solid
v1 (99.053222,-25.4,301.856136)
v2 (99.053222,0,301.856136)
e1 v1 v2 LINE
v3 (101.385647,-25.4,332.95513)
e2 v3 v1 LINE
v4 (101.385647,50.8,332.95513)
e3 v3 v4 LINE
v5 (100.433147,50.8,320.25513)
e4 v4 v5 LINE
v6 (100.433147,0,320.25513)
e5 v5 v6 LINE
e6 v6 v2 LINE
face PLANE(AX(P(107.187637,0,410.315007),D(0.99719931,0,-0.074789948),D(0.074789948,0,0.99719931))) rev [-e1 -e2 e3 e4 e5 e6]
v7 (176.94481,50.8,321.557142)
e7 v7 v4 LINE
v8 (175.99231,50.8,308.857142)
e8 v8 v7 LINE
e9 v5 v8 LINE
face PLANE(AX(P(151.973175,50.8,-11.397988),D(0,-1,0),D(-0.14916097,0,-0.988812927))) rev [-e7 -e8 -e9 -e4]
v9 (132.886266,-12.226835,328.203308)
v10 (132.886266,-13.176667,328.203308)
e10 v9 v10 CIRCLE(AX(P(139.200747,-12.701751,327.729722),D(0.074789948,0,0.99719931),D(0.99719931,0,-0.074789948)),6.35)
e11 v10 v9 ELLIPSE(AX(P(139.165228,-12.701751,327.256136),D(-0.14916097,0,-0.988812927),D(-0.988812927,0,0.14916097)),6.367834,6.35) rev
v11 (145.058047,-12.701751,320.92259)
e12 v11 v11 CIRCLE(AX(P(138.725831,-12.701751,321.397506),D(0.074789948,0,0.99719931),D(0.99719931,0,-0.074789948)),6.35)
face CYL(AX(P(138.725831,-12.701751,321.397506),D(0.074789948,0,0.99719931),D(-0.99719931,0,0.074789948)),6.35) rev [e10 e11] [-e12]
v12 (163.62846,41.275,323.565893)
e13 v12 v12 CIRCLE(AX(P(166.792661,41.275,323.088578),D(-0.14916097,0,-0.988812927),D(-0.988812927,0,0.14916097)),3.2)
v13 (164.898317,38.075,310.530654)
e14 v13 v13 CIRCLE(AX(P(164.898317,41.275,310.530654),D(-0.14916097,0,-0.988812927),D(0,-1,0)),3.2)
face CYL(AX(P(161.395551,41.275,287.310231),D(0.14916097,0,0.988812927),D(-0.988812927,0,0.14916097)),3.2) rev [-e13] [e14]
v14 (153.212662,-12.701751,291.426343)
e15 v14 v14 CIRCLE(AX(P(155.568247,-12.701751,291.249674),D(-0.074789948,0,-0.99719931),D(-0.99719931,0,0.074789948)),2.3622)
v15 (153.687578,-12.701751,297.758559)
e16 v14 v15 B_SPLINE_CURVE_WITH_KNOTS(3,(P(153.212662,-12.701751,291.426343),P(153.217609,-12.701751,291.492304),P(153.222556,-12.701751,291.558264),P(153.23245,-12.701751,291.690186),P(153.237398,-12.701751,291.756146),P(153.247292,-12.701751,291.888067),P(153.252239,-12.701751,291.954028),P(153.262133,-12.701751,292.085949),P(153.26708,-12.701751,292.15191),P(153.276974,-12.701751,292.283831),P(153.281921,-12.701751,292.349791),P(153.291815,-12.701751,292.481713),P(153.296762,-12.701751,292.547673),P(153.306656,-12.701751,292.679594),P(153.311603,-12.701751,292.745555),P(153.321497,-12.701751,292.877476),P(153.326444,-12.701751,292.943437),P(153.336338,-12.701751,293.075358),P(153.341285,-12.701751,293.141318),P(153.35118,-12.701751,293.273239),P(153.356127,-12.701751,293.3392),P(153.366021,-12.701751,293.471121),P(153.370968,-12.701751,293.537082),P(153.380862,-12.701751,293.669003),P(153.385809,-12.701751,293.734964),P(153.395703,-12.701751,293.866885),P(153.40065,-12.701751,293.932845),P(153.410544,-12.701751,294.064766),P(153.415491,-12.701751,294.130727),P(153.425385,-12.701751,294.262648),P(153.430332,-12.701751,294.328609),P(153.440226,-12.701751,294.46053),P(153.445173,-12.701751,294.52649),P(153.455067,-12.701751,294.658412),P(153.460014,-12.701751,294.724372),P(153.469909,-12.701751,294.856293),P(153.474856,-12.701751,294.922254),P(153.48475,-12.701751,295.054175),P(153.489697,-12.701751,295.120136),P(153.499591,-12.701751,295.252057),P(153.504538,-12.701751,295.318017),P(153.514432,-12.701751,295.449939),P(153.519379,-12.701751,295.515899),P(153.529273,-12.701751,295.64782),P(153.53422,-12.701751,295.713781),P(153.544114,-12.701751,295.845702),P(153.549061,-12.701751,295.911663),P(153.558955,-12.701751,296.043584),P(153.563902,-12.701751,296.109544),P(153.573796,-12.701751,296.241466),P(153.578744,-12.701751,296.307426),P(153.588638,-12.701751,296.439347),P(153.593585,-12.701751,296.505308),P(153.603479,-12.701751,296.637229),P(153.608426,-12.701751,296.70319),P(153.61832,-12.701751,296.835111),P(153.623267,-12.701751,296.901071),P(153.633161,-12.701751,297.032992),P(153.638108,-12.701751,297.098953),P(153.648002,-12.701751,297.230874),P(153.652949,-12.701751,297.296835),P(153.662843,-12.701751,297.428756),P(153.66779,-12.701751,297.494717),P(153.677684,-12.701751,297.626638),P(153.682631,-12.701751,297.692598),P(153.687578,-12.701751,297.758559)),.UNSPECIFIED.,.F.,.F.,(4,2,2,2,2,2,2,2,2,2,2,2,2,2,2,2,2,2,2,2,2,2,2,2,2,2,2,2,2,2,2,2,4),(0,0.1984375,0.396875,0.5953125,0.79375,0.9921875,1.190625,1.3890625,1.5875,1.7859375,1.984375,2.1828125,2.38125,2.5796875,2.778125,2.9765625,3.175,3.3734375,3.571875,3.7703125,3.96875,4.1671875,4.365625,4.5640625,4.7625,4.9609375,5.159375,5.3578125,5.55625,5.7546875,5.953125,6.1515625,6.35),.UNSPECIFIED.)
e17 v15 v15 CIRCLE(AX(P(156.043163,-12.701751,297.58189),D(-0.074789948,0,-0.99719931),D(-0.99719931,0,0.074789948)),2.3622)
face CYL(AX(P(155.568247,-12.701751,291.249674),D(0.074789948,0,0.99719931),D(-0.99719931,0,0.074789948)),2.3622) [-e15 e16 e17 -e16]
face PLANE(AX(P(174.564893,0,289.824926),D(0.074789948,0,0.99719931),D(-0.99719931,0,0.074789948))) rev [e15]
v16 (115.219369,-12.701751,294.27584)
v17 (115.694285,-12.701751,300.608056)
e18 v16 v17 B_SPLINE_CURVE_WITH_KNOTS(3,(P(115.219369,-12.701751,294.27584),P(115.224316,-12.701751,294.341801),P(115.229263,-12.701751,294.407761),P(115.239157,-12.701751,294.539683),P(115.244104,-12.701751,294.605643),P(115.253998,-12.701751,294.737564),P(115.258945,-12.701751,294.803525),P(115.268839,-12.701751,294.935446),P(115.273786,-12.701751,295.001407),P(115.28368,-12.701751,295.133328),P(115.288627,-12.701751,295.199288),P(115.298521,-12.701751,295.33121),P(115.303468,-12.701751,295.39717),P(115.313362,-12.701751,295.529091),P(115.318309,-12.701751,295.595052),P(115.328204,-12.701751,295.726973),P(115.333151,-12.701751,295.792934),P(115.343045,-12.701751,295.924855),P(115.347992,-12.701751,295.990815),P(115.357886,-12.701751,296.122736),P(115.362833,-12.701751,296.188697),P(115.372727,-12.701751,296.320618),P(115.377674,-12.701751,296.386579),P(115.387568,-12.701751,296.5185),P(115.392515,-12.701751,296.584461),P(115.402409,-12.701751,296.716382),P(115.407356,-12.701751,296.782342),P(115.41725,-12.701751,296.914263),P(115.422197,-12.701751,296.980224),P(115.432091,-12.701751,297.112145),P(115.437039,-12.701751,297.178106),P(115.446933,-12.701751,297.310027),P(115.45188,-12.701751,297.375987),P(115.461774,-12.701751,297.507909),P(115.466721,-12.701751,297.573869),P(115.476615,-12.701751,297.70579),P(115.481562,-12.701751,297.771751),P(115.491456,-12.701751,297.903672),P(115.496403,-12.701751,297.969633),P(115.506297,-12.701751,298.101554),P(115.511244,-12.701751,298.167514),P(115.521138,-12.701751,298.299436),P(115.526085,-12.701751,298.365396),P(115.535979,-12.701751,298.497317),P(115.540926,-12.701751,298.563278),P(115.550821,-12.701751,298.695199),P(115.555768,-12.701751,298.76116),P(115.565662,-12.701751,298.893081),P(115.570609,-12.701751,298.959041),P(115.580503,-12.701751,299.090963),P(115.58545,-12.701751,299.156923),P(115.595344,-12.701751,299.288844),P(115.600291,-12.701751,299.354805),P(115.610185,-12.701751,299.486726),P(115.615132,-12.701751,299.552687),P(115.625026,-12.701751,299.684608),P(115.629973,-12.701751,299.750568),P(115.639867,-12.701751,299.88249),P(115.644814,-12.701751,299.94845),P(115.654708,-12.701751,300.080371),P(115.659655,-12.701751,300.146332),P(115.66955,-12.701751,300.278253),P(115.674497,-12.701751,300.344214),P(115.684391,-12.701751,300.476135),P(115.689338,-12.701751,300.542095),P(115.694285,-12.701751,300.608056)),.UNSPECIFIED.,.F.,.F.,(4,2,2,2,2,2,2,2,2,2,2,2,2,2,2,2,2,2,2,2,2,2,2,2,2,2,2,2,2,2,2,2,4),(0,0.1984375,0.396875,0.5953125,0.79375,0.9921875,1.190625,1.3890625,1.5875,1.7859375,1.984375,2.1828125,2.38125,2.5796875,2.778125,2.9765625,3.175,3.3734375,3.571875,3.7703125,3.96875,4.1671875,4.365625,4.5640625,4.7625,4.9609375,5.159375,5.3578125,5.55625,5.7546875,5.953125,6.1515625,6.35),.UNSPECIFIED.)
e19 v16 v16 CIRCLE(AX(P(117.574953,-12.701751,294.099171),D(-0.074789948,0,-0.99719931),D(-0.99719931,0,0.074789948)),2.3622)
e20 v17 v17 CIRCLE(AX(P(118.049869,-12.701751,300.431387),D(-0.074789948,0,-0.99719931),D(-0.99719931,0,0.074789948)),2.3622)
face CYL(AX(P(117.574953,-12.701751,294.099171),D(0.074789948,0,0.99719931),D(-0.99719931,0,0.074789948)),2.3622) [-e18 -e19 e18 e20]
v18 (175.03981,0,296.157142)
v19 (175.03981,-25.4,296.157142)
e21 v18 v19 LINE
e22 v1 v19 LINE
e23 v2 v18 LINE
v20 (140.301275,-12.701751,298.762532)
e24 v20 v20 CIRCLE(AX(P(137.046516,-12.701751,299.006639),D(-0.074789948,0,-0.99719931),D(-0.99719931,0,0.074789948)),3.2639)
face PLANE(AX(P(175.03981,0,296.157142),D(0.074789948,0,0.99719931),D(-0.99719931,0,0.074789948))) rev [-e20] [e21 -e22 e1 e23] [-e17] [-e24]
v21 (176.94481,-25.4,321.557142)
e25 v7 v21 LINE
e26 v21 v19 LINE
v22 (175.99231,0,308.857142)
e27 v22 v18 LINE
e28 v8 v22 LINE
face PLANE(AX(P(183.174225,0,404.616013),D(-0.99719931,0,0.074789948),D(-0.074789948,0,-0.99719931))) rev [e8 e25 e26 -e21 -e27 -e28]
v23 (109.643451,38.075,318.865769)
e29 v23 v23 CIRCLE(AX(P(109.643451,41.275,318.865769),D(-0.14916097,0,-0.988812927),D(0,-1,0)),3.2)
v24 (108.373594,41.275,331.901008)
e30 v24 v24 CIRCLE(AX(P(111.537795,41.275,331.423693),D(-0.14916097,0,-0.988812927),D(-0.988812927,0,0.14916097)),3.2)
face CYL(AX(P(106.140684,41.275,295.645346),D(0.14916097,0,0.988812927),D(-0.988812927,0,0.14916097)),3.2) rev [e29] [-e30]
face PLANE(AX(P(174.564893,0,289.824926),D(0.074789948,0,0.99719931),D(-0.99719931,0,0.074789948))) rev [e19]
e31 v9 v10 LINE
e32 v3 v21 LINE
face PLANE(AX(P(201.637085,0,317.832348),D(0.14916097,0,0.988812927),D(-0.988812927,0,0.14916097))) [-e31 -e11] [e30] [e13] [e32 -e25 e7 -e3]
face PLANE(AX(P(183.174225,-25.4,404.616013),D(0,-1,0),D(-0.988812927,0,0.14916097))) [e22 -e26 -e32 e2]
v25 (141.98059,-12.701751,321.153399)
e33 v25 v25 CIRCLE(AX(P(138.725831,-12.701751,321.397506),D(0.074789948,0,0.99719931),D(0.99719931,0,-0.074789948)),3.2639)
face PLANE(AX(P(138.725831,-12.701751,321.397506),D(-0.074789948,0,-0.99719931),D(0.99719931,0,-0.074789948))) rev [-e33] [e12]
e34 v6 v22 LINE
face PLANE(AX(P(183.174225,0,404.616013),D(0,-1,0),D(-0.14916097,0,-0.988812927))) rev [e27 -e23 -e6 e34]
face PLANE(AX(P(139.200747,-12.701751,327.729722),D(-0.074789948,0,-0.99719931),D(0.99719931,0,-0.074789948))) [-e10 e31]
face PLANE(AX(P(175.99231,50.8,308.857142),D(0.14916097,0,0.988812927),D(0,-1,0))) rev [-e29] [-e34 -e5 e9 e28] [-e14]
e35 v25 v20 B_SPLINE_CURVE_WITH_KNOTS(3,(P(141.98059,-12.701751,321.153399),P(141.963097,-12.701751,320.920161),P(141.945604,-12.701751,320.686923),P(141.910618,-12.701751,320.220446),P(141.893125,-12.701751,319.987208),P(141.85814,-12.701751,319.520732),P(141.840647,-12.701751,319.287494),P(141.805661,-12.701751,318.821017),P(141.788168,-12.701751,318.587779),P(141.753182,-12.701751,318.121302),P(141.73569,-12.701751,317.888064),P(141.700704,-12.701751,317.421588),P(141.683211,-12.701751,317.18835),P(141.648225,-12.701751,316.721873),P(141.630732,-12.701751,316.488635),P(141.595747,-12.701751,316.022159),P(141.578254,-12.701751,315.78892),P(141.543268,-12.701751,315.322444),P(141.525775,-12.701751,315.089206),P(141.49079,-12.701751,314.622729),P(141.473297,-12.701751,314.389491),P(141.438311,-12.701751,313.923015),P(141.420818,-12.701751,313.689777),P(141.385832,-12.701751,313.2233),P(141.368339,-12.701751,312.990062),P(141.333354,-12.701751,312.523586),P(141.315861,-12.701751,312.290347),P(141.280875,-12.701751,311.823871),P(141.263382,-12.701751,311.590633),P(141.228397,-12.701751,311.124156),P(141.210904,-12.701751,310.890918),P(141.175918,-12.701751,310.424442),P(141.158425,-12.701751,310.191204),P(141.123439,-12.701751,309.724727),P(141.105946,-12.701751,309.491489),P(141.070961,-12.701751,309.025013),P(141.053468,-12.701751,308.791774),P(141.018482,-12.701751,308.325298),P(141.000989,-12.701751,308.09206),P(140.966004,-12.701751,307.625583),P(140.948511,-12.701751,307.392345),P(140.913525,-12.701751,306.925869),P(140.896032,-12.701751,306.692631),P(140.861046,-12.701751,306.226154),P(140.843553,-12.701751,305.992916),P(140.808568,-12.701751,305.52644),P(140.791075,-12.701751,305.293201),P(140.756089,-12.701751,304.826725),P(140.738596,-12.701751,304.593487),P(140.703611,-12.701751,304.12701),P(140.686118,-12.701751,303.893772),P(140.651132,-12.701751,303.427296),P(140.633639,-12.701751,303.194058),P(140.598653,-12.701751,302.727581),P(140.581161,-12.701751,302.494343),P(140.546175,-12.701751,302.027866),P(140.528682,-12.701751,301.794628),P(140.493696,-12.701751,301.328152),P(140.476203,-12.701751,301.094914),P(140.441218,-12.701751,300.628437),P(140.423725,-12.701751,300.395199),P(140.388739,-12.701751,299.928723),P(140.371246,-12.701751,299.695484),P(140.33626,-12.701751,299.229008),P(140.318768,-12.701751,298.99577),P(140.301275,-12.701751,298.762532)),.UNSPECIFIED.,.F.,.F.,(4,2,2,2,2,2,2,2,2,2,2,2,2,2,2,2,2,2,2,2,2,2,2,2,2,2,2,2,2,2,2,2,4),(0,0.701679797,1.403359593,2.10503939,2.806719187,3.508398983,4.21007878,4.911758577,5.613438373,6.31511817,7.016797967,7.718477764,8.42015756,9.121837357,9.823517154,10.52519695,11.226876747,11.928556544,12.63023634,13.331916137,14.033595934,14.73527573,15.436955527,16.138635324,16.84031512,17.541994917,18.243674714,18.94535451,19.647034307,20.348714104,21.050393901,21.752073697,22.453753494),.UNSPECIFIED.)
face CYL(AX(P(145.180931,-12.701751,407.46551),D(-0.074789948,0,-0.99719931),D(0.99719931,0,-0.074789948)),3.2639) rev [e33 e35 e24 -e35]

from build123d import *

# Parameters (mm, degrees)
BOSS_EXTRUDE1_OUTLINE_W   = 76.2
BOSS_EXTRUDE1_OUTLINE_H   = 25.4
BOSS_EXTRUDE1_OUTLINE_R   = 3.2639
BOSS_EXTRUDE1_DEPTH       = 25.471337323
BOSS_EXTRUDE1_START       = -25.4
BOSS_EXTRUDE1_2_DEPTH     = 25.4
BOSS_EXTRUDE1_START_2     = 333.890252769
BOSS_EXTRUDE1_3_OUTLINE_R = 3.2639
BOSS_EXTRUDE1_3_DEPTH     = 5.715
BOSS_EXTRUDE2_START       = 302.068915446
BOSS_EXTRUDE2_OUTLINE_R   = 2.3622
BOSS_EXTRUDE2_DEPTH       = 6.931084554
BOSS_EXTRUDE3_DEPTH       = 50.8
SKETCH6_R                 = 3.19999995
CUT_EXTRUDE1_DEPTH        = 120.033223303
SKETCH8_R                 = 6.35
CUT_EXTRUDE2_DEPTH        = 6.35


with BuildPart() as part:
    # Boss-Extrude1: read off the stored shape, not the designer's step
    # Boss-Extrude1 outline → Boss-Extrude1 (new body)
    with BuildSketch(Plane(origin=(23.066634723, 0, 307.55512964), x_dir=(0.9971993098884564, 0, -0.07478994824163422), z_dir=(0.07478994824163422, 0, 0.9971993098884564))):
        with Locations((38.1, -12.7)):
            Rectangle(BOSS_EXTRUDE1_OUTLINE_W, BOSS_EXTRUDE1_OUTLINE_H)
        with Locations((38.1, -12.701750828)):
            Circle(BOSS_EXTRUDE1_OUTLINE_R, mode=Mode.SUBTRACT)
    extrude(amount=BOSS_EXTRUDE1_DEPTH)

    # Boss-Extrude1 2 outline → Boss-Extrude1 2 (add)
    with BuildSketch(Plane(origin=(0, 0, 0), x_dir=(1, 0, 0), z_dir=(0, 1, 0)).offset(BOSS_EXTRUDE1_START)):
        Polygon((101.385646691, -332.95512964), (100.958222137, -327.256135584), (24.971634723, -332.95512964), align=None)
    extrude(amount=BOSS_EXTRUDE1_2_DEPTH)

    # Boss-Extrude1 3 outline → Boss-Extrude1 3 (cut)
    with BuildSketch(Plane(origin=(0, 0, 0), x_dir=(0.9971993098884564, 0, -0.07478994824163422), z_dir=(0.07478994824163422, 0, 0.9971993098884564)).offset(BOSS_EXTRUDE1_START_2)):
        with Locations((38.1, -12.701750828)):
            Circle(BOSS_EXTRUDE1_3_OUTLINE_R)
    extrude(amount=BOSS_EXTRUDE1_3_DEPTH, mode=Mode.SUBTRACT)

    # Boss-Extrude2: read off the stored shape, not the designer's step
    # Boss-Extrude2 outline → Boss-Extrude2 (add)
    with BuildSketch(Plane(origin=(0, 0, 0), x_dir=(0.9971993098884564, 0, -0.07478994824163422), z_dir=(0.07478994824163422, 0, 0.9971993098884564)).offset(BOSS_EXTRUDE2_START)):
        with Locations((57.15, -12.701750828)):
            Circle(BOSS_EXTRUDE2_OUTLINE_R)
        with Locations((19.05, -12.701750828)):
            Circle(BOSS_EXTRUDE2_OUTLINE_R)
    extrude(amount=BOSS_EXTRUDE2_DEPTH)

    # Sketch7 → Boss-Extrude3 (add)
    with BuildSketch(Plane(origin=(0, 0, 0), x_dir=(1, 0, 0), z_dir=(0, 1, 0))):
        Polygon((24.971634723, -332.95512964), (24.019134723, -320.25512964), (100.433146691, -320.25512964), (101.385646691, -332.95512964), align=None)
    extrude(amount=BOSS_EXTRUDE3_DEPTH)

    # Sketch6 → Cut-Extrude1 (cut, through all)
    with BuildSketch(Plane.XY.offset(332.95512964)):
        with Locations((35.238640707, 41.275)):
            Circle(SKETCH6_R)
        with Locations((91.118640707, 41.275)):
            Circle(SKETCH6_R)
    extrude(amount=-CUT_EXTRUDE1_DEPTH, mode=Mode.SUBTRACT)

    # Sketch8 → Cut-Extrude2 (cut)
    with BuildSketch(Plane(origin=(25.220865956, 0, 336.278212746), x_dir=(-0.9971993098884564, 0, 0.07478994824163424), z_dir=(-0.07478994824163424, 0, -0.9971993098884564))):
        with Locations(Location((-38.1, -12.701750828, 0), (0, 0, 175.710846671))):
            Circle(SKETCH8_R)
    extrude(amount=CUT_EXTRUDE2_DEPTH, mode=Mode.SUBTRACT)


with BuildPart() as body_2:
    # Mirror1: mirrored copy
    add(part.part.mirror(Plane(origin=(107.187637483, 0, 410.315006871), x_dir=(0.07478994824163424, 0, 0.9971993098884564), z_dir=(-0.9971993098884564, 1.0351948349208248e-14, 0.07478994824163424))))


solid = body_2.part
